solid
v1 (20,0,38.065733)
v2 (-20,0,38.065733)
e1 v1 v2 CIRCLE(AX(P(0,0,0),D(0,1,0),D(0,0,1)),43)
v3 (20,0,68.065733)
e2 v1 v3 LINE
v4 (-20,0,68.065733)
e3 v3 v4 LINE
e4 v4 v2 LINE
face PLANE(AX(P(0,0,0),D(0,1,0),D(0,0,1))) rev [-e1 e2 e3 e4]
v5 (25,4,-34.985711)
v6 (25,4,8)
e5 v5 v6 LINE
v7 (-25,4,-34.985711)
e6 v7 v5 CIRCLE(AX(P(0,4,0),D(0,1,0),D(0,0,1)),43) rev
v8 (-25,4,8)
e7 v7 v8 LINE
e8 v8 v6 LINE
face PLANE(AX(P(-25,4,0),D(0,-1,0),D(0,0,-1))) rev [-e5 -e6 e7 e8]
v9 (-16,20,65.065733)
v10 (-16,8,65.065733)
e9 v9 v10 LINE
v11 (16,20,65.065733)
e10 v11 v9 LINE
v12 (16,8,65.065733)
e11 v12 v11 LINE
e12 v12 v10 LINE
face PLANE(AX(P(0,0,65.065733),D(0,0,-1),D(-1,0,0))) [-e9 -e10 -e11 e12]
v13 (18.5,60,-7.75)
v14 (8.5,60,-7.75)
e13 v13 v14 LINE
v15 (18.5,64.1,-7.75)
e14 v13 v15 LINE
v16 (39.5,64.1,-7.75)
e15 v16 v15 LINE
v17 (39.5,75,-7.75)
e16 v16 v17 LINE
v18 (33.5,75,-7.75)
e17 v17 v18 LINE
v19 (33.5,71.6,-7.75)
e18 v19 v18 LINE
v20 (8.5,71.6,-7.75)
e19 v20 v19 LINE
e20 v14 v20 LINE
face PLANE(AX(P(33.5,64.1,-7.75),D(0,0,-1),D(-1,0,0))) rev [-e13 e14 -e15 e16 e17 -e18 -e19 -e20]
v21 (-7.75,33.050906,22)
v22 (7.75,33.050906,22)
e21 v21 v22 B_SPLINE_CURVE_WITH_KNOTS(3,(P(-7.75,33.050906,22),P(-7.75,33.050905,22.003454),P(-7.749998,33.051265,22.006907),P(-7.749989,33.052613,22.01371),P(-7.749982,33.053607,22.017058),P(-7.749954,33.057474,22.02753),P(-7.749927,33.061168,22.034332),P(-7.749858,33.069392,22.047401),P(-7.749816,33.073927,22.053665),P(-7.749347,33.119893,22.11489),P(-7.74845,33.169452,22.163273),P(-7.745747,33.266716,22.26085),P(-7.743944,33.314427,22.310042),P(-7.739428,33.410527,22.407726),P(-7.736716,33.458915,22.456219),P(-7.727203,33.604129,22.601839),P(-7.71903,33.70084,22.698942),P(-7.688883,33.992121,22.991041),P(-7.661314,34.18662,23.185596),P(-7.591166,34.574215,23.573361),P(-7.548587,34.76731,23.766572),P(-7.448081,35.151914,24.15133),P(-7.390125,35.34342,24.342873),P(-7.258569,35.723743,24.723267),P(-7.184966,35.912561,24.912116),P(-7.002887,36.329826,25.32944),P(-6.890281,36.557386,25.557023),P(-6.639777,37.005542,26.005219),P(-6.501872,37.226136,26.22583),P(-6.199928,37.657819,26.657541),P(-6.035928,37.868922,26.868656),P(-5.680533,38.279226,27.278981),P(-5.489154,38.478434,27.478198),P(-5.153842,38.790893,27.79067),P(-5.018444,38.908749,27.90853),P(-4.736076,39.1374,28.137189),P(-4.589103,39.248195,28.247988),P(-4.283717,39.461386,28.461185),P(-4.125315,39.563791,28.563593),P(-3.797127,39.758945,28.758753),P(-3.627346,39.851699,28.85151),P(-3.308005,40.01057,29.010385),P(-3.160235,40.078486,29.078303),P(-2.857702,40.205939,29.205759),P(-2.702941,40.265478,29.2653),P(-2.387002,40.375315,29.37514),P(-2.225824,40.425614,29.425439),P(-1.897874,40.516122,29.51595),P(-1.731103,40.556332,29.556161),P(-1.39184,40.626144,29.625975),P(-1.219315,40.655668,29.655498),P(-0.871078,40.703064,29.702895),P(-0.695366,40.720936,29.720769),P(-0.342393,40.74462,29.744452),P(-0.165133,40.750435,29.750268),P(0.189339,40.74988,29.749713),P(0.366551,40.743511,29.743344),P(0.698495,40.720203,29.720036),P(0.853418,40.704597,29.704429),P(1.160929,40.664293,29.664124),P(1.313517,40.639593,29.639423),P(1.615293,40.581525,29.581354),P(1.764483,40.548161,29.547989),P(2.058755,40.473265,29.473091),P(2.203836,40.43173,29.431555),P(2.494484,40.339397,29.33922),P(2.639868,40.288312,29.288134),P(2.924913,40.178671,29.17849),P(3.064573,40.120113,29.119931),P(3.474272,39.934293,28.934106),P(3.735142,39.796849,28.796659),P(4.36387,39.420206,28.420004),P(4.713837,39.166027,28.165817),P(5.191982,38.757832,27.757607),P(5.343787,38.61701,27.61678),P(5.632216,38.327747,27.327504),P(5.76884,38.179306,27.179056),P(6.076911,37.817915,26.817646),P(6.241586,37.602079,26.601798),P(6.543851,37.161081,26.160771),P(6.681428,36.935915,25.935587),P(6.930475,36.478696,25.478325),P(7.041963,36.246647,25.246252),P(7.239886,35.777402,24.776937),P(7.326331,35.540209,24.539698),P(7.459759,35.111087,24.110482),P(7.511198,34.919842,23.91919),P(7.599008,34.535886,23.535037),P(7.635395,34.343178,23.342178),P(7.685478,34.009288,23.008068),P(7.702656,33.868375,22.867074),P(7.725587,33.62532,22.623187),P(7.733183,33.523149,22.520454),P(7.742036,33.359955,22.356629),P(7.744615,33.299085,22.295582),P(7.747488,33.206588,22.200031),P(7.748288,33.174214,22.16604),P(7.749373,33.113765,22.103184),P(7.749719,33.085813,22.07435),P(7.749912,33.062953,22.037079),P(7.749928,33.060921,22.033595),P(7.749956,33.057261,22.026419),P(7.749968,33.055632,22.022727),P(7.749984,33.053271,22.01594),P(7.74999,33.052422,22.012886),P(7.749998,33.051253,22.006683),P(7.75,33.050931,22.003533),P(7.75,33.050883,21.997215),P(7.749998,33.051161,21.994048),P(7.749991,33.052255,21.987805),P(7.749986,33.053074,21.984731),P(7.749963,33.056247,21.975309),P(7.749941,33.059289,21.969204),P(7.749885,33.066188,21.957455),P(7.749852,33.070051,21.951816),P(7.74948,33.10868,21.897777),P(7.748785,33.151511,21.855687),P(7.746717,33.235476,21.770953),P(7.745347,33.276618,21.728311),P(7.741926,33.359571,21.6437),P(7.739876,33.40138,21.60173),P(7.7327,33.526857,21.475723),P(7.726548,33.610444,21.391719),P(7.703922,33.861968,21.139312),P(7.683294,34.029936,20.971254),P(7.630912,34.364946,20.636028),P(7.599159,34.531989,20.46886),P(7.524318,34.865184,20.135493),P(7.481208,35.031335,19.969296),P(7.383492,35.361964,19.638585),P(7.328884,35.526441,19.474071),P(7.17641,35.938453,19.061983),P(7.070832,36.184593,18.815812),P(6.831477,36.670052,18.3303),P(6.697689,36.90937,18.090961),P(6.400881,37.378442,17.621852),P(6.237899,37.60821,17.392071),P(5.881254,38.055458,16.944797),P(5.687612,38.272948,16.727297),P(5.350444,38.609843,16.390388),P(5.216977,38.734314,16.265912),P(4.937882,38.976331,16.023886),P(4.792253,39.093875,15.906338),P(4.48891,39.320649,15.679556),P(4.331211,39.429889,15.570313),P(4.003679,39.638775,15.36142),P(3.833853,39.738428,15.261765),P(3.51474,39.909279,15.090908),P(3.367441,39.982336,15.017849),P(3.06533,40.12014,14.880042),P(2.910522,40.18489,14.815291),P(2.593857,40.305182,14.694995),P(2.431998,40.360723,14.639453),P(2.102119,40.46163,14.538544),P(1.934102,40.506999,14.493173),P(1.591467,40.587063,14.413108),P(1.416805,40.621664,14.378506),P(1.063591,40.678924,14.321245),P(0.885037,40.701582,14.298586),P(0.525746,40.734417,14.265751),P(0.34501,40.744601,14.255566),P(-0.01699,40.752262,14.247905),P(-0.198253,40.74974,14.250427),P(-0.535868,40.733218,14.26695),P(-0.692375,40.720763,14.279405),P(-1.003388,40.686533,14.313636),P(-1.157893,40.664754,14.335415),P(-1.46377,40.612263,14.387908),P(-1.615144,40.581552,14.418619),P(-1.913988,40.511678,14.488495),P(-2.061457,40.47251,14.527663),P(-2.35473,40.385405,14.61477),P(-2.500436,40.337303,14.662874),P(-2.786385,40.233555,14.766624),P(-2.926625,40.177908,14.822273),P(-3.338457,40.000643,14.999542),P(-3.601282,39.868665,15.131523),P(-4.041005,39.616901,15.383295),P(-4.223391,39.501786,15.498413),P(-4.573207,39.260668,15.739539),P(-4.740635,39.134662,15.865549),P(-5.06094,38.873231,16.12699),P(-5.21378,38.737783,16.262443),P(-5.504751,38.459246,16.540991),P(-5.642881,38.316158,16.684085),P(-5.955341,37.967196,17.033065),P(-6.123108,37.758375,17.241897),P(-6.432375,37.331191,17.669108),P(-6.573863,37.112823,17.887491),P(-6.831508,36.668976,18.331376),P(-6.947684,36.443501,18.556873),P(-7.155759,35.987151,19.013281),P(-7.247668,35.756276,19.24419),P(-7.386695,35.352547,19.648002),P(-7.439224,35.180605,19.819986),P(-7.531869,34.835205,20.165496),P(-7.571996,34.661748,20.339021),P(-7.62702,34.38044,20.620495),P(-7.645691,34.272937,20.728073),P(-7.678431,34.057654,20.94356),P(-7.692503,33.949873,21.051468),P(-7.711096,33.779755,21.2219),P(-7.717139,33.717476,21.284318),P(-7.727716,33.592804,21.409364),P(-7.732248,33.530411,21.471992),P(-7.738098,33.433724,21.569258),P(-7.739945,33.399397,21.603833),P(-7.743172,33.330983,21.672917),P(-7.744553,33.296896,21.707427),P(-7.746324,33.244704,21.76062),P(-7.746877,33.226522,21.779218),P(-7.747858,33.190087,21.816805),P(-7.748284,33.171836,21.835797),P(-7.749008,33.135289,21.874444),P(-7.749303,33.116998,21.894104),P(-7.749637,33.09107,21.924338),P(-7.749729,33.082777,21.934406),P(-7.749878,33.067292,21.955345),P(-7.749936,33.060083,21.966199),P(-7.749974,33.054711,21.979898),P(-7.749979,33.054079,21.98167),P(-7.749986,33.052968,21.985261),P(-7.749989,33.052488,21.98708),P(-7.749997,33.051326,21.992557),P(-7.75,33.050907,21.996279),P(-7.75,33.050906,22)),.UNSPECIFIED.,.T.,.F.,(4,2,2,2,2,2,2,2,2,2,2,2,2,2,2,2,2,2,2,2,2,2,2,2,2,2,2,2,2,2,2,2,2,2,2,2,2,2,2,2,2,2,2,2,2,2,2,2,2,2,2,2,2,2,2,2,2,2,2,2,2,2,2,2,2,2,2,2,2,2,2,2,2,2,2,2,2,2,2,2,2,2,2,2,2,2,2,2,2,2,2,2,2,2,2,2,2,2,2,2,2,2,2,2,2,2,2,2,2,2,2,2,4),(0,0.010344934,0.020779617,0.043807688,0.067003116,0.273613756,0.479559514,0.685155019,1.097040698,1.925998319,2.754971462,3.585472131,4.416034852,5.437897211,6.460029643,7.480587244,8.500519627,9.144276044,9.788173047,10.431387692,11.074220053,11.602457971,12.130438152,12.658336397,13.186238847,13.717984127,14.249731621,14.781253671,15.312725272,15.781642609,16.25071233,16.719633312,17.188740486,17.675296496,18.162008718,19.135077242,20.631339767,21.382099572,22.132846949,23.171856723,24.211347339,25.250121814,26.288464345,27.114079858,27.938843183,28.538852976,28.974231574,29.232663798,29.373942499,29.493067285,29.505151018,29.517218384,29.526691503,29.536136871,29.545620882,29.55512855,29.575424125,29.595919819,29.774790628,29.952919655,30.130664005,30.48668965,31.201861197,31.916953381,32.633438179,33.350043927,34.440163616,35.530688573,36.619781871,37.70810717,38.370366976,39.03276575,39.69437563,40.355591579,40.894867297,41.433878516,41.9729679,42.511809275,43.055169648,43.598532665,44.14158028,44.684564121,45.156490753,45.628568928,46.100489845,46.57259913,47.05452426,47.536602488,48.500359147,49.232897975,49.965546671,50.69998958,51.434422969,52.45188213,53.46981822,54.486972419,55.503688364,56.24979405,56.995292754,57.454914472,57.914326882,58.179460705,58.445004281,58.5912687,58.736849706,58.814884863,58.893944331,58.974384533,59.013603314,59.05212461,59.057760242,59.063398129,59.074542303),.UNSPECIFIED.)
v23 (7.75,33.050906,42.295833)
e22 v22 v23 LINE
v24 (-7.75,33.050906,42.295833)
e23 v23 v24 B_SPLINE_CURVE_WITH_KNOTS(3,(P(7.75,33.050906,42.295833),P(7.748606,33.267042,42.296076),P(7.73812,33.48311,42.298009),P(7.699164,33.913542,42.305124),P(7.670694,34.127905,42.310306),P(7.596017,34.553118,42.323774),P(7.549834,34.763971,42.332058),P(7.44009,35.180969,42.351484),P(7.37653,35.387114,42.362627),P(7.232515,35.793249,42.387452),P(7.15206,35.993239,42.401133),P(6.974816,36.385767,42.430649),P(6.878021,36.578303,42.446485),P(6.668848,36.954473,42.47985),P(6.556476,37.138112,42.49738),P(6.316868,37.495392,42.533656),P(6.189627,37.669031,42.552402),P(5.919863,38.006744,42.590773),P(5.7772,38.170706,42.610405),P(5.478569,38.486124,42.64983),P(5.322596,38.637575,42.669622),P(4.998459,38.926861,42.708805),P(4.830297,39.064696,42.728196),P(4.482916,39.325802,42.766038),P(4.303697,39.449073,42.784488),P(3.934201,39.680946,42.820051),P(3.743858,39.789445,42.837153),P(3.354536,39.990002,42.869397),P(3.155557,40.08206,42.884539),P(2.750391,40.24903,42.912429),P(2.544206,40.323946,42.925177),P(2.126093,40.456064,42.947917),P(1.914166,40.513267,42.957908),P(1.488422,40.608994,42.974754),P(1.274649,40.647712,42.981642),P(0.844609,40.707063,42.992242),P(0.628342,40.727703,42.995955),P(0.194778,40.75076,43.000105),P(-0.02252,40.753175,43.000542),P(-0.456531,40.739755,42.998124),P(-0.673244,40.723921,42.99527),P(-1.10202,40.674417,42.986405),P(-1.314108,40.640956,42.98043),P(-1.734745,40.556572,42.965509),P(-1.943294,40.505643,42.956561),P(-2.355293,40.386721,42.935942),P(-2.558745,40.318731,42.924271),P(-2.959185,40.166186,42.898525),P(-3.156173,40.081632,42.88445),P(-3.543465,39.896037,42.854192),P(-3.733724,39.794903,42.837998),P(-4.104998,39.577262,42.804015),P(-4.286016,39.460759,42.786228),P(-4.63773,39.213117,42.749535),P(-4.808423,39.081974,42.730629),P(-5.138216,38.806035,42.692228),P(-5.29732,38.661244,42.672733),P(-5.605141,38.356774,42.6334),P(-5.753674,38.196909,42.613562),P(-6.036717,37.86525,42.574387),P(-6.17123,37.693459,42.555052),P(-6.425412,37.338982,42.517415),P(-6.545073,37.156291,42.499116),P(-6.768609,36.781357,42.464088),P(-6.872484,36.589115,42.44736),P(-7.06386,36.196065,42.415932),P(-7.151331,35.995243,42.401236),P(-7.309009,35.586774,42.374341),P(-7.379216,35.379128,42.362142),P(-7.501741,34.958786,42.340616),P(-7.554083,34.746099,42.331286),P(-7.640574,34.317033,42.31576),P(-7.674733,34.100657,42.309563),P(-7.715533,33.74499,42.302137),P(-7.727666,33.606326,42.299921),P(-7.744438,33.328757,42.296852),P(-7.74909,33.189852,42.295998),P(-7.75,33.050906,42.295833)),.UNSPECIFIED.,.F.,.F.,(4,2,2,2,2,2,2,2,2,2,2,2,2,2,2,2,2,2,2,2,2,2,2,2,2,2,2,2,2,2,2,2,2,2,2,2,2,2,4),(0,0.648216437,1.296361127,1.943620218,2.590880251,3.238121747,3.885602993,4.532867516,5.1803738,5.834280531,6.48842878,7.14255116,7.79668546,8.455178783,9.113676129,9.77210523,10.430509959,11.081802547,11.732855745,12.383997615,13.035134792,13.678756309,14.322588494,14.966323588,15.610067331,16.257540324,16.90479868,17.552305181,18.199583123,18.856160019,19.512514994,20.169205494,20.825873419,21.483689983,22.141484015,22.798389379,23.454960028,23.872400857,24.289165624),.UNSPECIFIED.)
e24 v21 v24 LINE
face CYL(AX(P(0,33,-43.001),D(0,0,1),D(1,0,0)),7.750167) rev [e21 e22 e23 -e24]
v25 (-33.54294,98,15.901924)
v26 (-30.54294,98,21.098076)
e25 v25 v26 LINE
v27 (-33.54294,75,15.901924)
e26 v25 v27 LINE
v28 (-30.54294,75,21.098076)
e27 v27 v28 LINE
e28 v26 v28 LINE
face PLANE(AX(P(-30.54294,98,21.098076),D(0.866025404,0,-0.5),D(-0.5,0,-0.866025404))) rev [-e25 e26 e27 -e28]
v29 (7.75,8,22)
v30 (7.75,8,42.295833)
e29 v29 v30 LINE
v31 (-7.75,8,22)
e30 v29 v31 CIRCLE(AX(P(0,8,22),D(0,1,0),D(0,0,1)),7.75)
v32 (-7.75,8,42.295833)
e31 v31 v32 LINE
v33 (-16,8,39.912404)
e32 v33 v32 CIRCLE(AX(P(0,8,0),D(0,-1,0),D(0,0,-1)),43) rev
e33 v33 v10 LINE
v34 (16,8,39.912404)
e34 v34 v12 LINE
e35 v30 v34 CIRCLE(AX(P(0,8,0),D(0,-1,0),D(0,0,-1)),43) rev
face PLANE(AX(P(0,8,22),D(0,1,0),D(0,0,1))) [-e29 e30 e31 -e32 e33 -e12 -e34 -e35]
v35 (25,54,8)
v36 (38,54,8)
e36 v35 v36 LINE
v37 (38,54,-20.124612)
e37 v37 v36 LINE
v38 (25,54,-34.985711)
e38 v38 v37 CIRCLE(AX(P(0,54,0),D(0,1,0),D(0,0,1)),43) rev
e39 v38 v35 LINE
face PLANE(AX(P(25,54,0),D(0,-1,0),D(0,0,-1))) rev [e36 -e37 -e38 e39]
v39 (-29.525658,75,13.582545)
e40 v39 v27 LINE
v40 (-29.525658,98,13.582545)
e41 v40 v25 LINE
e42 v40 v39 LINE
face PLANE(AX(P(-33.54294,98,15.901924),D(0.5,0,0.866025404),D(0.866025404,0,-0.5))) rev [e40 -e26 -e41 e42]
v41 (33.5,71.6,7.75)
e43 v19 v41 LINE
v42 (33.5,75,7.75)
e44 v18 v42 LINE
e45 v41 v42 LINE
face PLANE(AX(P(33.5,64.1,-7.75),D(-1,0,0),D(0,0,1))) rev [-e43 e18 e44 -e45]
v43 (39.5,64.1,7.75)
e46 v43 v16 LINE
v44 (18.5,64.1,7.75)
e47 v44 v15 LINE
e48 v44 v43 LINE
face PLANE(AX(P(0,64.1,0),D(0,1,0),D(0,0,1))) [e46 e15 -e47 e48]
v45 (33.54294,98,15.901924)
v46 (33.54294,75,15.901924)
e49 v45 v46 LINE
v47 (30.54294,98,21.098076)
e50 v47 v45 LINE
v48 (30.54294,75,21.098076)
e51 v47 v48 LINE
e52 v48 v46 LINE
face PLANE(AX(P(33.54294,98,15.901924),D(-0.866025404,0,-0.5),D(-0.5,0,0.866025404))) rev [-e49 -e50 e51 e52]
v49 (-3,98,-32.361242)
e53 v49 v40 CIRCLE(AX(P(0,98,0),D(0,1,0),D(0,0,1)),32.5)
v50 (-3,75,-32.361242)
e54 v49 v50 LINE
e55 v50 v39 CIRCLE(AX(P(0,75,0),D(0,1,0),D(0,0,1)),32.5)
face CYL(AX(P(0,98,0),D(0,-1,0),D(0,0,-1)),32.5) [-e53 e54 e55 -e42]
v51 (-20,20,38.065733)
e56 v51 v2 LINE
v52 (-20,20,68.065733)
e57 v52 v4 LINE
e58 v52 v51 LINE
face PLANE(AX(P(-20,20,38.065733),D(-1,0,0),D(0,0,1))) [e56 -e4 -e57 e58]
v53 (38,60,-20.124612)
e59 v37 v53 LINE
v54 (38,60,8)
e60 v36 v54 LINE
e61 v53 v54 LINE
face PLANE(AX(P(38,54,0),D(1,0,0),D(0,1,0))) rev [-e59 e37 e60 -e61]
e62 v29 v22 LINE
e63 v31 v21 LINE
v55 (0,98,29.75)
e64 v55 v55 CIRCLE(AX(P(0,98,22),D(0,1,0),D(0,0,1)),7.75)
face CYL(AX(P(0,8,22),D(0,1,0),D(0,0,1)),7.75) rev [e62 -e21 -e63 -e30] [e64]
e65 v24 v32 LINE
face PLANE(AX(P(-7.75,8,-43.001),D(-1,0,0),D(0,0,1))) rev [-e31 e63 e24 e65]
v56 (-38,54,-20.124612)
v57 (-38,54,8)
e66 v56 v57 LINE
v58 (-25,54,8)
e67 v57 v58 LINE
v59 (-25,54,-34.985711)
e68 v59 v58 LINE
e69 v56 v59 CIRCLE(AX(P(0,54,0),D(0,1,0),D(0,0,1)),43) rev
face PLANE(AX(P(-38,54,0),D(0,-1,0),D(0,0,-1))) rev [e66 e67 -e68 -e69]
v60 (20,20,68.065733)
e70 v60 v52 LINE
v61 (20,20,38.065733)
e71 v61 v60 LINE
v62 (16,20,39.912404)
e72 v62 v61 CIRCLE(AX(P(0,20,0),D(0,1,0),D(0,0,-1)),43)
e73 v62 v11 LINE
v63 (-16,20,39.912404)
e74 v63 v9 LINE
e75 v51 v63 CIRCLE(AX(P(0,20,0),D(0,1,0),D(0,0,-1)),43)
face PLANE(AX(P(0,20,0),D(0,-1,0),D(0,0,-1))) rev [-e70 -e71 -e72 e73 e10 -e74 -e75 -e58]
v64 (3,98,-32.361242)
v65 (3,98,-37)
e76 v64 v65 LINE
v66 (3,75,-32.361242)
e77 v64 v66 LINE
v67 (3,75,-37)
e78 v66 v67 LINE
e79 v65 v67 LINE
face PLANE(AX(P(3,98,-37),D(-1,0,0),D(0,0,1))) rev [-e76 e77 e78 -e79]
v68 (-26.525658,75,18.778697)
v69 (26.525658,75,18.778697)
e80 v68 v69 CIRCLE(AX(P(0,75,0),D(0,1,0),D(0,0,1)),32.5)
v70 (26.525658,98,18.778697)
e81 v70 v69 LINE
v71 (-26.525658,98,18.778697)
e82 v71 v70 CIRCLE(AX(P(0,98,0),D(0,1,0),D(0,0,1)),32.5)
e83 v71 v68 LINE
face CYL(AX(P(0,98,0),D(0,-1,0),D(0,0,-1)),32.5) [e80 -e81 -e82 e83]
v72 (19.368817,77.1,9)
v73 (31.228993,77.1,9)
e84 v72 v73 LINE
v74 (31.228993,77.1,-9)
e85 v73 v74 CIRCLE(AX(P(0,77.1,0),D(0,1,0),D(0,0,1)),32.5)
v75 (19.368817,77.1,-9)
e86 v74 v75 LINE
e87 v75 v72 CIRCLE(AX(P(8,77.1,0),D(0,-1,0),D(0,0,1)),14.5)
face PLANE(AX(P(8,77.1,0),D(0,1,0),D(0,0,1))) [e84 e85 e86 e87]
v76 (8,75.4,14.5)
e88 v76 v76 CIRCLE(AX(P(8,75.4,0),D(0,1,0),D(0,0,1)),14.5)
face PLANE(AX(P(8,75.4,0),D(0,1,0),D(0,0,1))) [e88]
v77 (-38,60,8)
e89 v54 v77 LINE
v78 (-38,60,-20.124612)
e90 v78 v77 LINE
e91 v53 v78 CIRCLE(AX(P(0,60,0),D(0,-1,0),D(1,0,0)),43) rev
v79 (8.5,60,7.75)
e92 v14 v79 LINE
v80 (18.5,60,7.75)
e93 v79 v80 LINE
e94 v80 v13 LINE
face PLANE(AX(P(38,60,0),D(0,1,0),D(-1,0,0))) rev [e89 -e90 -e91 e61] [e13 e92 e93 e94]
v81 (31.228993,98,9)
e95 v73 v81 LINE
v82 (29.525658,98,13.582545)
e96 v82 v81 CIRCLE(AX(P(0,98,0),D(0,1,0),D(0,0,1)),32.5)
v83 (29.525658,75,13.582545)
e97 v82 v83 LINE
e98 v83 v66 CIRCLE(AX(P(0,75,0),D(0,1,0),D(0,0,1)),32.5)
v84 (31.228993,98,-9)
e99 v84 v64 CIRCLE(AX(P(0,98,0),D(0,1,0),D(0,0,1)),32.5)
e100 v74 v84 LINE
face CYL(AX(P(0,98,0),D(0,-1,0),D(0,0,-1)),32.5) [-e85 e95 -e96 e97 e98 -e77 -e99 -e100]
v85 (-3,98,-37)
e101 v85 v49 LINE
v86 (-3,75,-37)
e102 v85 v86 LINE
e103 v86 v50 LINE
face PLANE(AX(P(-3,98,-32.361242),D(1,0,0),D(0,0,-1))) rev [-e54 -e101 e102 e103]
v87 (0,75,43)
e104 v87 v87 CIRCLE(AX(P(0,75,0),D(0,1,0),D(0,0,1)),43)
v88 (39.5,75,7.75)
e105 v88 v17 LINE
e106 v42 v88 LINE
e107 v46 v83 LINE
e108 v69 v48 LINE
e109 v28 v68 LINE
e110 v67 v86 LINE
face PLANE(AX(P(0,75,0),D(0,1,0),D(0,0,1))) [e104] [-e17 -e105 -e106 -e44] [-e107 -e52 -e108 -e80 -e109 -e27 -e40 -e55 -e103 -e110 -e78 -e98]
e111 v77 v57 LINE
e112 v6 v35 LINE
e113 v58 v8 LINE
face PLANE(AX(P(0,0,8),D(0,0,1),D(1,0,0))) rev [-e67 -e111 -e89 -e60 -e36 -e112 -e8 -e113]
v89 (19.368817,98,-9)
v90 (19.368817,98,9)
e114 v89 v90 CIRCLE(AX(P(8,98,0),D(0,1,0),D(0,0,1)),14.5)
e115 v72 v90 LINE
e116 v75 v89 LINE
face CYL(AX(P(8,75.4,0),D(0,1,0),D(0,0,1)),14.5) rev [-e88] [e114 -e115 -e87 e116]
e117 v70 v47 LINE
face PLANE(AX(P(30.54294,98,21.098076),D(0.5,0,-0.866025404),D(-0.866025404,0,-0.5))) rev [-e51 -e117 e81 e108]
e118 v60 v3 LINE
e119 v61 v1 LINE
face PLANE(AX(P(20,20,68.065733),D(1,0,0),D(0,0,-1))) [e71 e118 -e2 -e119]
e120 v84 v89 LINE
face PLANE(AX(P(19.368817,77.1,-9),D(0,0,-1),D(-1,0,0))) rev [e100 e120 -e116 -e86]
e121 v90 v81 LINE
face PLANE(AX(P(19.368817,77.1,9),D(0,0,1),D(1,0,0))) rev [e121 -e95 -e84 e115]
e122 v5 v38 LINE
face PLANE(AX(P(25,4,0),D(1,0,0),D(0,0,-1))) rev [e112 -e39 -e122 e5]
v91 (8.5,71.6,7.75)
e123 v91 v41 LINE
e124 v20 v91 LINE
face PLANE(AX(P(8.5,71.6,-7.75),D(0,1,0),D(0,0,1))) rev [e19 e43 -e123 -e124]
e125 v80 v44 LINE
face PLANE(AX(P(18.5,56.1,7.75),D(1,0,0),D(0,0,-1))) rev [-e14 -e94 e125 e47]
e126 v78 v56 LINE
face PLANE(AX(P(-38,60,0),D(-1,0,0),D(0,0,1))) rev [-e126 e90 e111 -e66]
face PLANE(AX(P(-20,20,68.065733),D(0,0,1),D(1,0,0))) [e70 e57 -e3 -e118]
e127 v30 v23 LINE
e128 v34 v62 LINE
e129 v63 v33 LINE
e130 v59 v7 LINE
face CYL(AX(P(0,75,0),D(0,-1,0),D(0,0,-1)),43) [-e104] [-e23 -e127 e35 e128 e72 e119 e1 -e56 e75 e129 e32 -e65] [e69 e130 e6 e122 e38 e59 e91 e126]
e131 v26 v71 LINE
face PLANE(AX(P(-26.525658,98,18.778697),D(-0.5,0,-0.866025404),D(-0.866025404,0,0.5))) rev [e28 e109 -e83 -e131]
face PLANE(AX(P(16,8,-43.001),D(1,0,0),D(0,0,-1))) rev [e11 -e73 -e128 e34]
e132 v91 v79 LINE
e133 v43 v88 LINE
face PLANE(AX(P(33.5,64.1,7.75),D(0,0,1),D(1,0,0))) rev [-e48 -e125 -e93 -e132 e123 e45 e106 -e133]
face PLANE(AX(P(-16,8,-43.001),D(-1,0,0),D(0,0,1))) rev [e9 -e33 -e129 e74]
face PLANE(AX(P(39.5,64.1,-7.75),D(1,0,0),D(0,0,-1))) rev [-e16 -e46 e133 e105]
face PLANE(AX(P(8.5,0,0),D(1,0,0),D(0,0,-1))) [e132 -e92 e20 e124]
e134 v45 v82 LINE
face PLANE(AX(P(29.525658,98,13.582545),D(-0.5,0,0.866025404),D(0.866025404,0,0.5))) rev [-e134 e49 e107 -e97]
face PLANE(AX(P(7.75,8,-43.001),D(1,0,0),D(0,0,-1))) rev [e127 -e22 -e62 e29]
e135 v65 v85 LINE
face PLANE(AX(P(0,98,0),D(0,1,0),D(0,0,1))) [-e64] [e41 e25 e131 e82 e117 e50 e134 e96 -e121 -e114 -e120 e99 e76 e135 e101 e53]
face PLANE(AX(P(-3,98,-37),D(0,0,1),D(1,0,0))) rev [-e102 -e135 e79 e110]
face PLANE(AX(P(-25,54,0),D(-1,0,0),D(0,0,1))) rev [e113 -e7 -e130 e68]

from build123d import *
from build123d.topology import SkipClean

# Parameters (mm, degrees)
SKETCH2_R                = 43
BOSS_EXTRUDE1_DEPTH      = 75
BOSS_EXTRUDE2_DEPTH      = 23
SKETCH4_R                = 14.5
CUT_EXTRUDE2_DEPTH       = 22.6
CUT_EXTRUDE3_START       = -20.9
CUT_EXTRUDE3_DEPTH       = 20.9
CUT_EXTRUDE6_START       = 4
CUT_EXTRUDE6_DEPTH       = 56
CUT_EXTRUDE6_START_2     = 54
CUT_EXTRUDE6_2_DEPTH     = 6
SKETCH8_W                = 6
SKETCH8_H                = 15.5
CUT_EXTRUDE7_DEPTH       = 13
SKETCH10_W               = 15.5
SKETCH10_H               = 7.5
CUT_EXTRUDE8_DEPTH       = 25
SKETCH12_W               = 10
SKETCH12_H               = 15.5
CUT_EXTRUDE9_DEPTH       = 8
SKETCH7_R                = 7.75
CUT_EXTRUDE10_DEPTH      = 90
BOSS_EXTRUDE3_DEPTH      = 20
CUT_EXTRUDE11_REACH      = 156.236
CUT_EXTRUDE12_REACH      = 156.236
CUT_EXTRUDE12_END_RADIUS = 43
SKETCH16_W               = 32
SKETCH16_H               = 12
SKETCH17_W               = 40
SKETCH17_H               = 20
BOSS_EXTRUDE4_DEPTH      = 3


# Read off the part's stored shape, not the designer's step: Cut-Extrude6
with BuildPart() as part:
    # Sketch2 → Boss-Extrude1 (new body)
    with BuildSketch(Plane(origin=(0, 0, 0), x_dir=(1, 0, 0), z_dir=(0, 1, 0))):
        with Locations(Location((0, 0, 0), (0, 0, 270))):
            Circle(SKETCH2_R)
    extrude(amount=BOSS_EXTRUDE1_DEPTH)

    # Sketch3 → Boss-Extrude2 (add)
    with BuildSketch(Plane(origin=(0, 75, 0), x_dir=(1, 0, 0), z_dir=(0, 1, 0))):
        with BuildLine():
            Line((-3, 32.361242251), (-3, 37))
            Line((-3, 37), (3, 37))
            Line((3, 37), (3, 32.361242251))
            ThreePointArc((3, 32.361242251), (28.145825623, 16.25), (29.525657887, -13.582544914))
            Line((29.525657887, -13.582544914), (33.54293994, -15.901923789))
            Line((33.54293994, -15.901923789), (30.54293994, -21.098076211))
            Line((30.54293994, -21.098076211), (26.525657887, -18.778697337))
            ThreePointArc((26.525657887, -18.778697337), (0, -32.5), (-26.525657887, -18.778697337))
            Line((-26.525657887, -18.778697337), (-30.54293994, -21.098076211))
            Line((-30.54293994, -21.098076211), (-33.54293994, -15.901923789))
            Line((-33.54293994, -15.901923789), (-29.525657887, -13.582544914))
            ThreePointArc((-29.525657887, -13.582544914), (-28.145825623, 16.25), (-3, 32.361242251))
        make_face()
    extrude(amount=BOSS_EXTRUDE2_DEPTH)

    # Sketch4 → Cut-Extrude2 (cut)
    with BuildSketch(Plane(origin=(0, 98, 0), x_dir=(1, 0, 0), z_dir=(0, 1, 0))):
        with Locations(Location((8, 0, 0), (0, 0, 270))):
            Circle(SKETCH4_R)
    extrude(amount=-CUT_EXTRUDE2_DEPTH, mode=Mode.SUBTRACT)

    # Sketch5 → Cut-Extrude3 (cut)
    with BuildSketch(Plane(origin=(0, 98, 0), x_dir=(1, 0, 0), z_dir=(0, 1, 0)).offset(CUT_EXTRUDE3_START)):
        with BuildLine():
            Line((19.368817001, 9), (31.228992939, 9))
            ThreePointArc((31.228992939, 9), (32.5, 0), (31.228992939, -9))
            Line((31.228992939, -9), (19.368817001, -9))
            ThreePointArc((19.368817001, -9), (22.5, 0), (19.368817001, 9))
        make_face()
    extrude(amount=CUT_EXTRUDE3_DEPTH, mode=Mode.SUBTRACT)

    # Cut-Extrude6 outline → Cut-Extrude6 (cut)
    with BuildSketch(Plane(origin=(0, 0, 0), x_dir=(1, 0, 0), z_dir=(0, 1, 0)).offset(CUT_EXTRUDE6_START)):
        with BuildLine():
            Line((-25, 34.985711369), (-25, -8))
            Line((-25, -8), (25, -8))
            Line((25, -8), (25, 34.985711369))
            ThreePointArc((25, 34.985711369), (0, 43), (-25, 34.985711369))
        make_face()
    extrude(amount=CUT_EXTRUDE6_DEPTH, mode=Mode.SUBTRACT)

    # Cut-Extrude6 2 outline → Cut-Extrude6 2 (cut)
    with BuildSketch(Plane(origin=(0, 0, 0), x_dir=(1, 0, 0), z_dir=(0, 1, 0)).offset(CUT_EXTRUDE6_START_2)):
        with BuildLine():
            Line((-38, 20.124611797), (-38, -8))
            Line((-38, -8), (-25, -8))
            Line((-25, -8), (-25, 34.985711369))
            ThreePointArc((-25, 34.985711369), (-32.36453414, 28.311427549), (-38, 20.124611797))
        make_face()
        with BuildLine():
            Line((25, 34.985711369), (25, -8))
            Line((25, -8), (38, -8))
            Line((38, -8), (38, 20.124611797))
            ThreePointArc((38, 20.124611797), (32.36453414, 28.311427549), (25, 34.985711369))
        make_face()
    extrude(amount=CUT_EXTRUDE6_2_DEPTH, mode=Mode.SUBTRACT)

    # Sketch8 → Cut-Extrude7 (cut)
    with BuildSketch(Plane(origin=(0, 77.1, 0), x_dir=(1, 0, 0), z_dir=(0, 1, 0))):
        with Locations((36.5, 0)):
            Rectangle(SKETCH8_W, SKETCH8_H)
    extrude(amount=-CUT_EXTRUDE7_DEPTH, mode=Mode.SUBTRACT)

    # Sketch10 → Cut-Extrude8 (cut)
    with BuildSketch(Plane(origin=(33.5, 0, 0), x_dir=(0, 0, -1), z_dir=(1, 0, 0))):
        with Locations((0, 67.85)):
            Rectangle(SKETCH10_W, SKETCH10_H)
    extrude(amount=-CUT_EXTRUDE8_DEPTH, mode=Mode.SUBTRACT)

    # Sketch12 → Cut-Extrude9 (cut)
    with BuildSketch(Plane(origin=(0, 64.1, 0), x_dir=(1, 0, 0), z_dir=(0, 1, 0))):
        with Locations((13.5, 0)):
            Rectangle(SKETCH12_W, SKETCH12_H)
    extrude(amount=-CUT_EXTRUDE9_DEPTH, mode=Mode.SUBTRACT)

    # Sketch7 → Cut-Extrude10 (cut)
    with BuildSketch(Plane(origin=(0, 98, 0), x_dir=(1, 0, 0), z_dir=(0, 1, 0))):
        with Locations(Location((0, -22, 0), (0, 0, 270))):
            Circle(SKETCH7_R)
    extrude(amount=-CUT_EXTRUDE10_DEPTH, mode=Mode.SUBTRACT)

    # Sketch13 → Boss-Extrude3 (add)
    with BuildSketch(Plane.XZ):
        with BuildLine():
            Line((-20, 38.065732621), (-20, 68.065732621))
            Line((-20, 68.065732621), (20, 68.065732621))
            Line((20, 68.065732621), (20, 38.065732621))
            ThreePointArc((20, 38.065732621), (0, 43), (-20, 38.065732621))
        make_face()
    extrude(amount=-BOSS_EXTRUDE3_DEPTH)

    # Sketch14 → Cut-Extrude11 (cut, up to next)
    with BuildSketch(Plane.XY.offset(68.065732621), mode=Mode.PRIVATE) as cut_extrude11_sk1:
        with BuildLine():
            Line((-7.75, 8), (7.75, 8))
            Line((7.75, 8), (7.75, 33.050905548))
            ThreePointArc((7.75, 33.050905548), (0, 40.750167184), (-7.75, 33.050905548))
            Line((-7.75, 33.050905548), (-7.75, 8))
        make_face()
    cut_extrude11_tool1 = extrude(cut_extrude11_sk1.sketch, amount=-CUT_EXTRUDE11_REACH, mode=Mode.PRIVATE) & part.part
    add(cut_extrude11_tool1.solids().sort_by_distance((0, 23.591664, 68.065733))[0], mode=Mode.SUBTRACT)

    # Cut-Extrude12: up to this cylinder (the profile starts outside it)
    with SkipClean():  # the faces are left unmerged after this step: merging them gives an invalid solid
        cut_extrude12_end = Plane(origin=(0, 14, 0), z_dir=(0, -1, 0)) * Cylinder(CUT_EXTRUDE12_END_RADIUS, 399.472, mode=Mode.PRIVATE)
        # Sketch16 → Cut-Extrude12 (cut, up to the surface)
        with BuildSketch(Plane.XY.offset(68.065732621), mode=Mode.PRIVATE) as cut_extrude12_sk1:
            with Locations((0, 14)):
                Rectangle(SKETCH16_W, SKETCH16_H)
        cut_extrude12_tool1 = extrude(cut_extrude12_sk1.sketch, amount=-CUT_EXTRUDE12_REACH, mode=Mode.PRIVATE) - cut_extrude12_end
        add(cut_extrude12_tool1.solids().sort_by_distance((0, 14, 68.065733))[0], mode=Mode.SUBTRACT)

    # Sketch17 → Boss-Extrude4 (add)
    with SkipClean():  # the faces are left unmerged after this step: merging them gives an invalid solid
        with BuildSketch(Plane.XY.offset(68.065732621)):
            with Locations((0, 10)):
                Rectangle(SKETCH17_W, SKETCH17_H)
        extrude(amount=-BOSS_EXTRUDE4_DEPTH)


solid = part.part
